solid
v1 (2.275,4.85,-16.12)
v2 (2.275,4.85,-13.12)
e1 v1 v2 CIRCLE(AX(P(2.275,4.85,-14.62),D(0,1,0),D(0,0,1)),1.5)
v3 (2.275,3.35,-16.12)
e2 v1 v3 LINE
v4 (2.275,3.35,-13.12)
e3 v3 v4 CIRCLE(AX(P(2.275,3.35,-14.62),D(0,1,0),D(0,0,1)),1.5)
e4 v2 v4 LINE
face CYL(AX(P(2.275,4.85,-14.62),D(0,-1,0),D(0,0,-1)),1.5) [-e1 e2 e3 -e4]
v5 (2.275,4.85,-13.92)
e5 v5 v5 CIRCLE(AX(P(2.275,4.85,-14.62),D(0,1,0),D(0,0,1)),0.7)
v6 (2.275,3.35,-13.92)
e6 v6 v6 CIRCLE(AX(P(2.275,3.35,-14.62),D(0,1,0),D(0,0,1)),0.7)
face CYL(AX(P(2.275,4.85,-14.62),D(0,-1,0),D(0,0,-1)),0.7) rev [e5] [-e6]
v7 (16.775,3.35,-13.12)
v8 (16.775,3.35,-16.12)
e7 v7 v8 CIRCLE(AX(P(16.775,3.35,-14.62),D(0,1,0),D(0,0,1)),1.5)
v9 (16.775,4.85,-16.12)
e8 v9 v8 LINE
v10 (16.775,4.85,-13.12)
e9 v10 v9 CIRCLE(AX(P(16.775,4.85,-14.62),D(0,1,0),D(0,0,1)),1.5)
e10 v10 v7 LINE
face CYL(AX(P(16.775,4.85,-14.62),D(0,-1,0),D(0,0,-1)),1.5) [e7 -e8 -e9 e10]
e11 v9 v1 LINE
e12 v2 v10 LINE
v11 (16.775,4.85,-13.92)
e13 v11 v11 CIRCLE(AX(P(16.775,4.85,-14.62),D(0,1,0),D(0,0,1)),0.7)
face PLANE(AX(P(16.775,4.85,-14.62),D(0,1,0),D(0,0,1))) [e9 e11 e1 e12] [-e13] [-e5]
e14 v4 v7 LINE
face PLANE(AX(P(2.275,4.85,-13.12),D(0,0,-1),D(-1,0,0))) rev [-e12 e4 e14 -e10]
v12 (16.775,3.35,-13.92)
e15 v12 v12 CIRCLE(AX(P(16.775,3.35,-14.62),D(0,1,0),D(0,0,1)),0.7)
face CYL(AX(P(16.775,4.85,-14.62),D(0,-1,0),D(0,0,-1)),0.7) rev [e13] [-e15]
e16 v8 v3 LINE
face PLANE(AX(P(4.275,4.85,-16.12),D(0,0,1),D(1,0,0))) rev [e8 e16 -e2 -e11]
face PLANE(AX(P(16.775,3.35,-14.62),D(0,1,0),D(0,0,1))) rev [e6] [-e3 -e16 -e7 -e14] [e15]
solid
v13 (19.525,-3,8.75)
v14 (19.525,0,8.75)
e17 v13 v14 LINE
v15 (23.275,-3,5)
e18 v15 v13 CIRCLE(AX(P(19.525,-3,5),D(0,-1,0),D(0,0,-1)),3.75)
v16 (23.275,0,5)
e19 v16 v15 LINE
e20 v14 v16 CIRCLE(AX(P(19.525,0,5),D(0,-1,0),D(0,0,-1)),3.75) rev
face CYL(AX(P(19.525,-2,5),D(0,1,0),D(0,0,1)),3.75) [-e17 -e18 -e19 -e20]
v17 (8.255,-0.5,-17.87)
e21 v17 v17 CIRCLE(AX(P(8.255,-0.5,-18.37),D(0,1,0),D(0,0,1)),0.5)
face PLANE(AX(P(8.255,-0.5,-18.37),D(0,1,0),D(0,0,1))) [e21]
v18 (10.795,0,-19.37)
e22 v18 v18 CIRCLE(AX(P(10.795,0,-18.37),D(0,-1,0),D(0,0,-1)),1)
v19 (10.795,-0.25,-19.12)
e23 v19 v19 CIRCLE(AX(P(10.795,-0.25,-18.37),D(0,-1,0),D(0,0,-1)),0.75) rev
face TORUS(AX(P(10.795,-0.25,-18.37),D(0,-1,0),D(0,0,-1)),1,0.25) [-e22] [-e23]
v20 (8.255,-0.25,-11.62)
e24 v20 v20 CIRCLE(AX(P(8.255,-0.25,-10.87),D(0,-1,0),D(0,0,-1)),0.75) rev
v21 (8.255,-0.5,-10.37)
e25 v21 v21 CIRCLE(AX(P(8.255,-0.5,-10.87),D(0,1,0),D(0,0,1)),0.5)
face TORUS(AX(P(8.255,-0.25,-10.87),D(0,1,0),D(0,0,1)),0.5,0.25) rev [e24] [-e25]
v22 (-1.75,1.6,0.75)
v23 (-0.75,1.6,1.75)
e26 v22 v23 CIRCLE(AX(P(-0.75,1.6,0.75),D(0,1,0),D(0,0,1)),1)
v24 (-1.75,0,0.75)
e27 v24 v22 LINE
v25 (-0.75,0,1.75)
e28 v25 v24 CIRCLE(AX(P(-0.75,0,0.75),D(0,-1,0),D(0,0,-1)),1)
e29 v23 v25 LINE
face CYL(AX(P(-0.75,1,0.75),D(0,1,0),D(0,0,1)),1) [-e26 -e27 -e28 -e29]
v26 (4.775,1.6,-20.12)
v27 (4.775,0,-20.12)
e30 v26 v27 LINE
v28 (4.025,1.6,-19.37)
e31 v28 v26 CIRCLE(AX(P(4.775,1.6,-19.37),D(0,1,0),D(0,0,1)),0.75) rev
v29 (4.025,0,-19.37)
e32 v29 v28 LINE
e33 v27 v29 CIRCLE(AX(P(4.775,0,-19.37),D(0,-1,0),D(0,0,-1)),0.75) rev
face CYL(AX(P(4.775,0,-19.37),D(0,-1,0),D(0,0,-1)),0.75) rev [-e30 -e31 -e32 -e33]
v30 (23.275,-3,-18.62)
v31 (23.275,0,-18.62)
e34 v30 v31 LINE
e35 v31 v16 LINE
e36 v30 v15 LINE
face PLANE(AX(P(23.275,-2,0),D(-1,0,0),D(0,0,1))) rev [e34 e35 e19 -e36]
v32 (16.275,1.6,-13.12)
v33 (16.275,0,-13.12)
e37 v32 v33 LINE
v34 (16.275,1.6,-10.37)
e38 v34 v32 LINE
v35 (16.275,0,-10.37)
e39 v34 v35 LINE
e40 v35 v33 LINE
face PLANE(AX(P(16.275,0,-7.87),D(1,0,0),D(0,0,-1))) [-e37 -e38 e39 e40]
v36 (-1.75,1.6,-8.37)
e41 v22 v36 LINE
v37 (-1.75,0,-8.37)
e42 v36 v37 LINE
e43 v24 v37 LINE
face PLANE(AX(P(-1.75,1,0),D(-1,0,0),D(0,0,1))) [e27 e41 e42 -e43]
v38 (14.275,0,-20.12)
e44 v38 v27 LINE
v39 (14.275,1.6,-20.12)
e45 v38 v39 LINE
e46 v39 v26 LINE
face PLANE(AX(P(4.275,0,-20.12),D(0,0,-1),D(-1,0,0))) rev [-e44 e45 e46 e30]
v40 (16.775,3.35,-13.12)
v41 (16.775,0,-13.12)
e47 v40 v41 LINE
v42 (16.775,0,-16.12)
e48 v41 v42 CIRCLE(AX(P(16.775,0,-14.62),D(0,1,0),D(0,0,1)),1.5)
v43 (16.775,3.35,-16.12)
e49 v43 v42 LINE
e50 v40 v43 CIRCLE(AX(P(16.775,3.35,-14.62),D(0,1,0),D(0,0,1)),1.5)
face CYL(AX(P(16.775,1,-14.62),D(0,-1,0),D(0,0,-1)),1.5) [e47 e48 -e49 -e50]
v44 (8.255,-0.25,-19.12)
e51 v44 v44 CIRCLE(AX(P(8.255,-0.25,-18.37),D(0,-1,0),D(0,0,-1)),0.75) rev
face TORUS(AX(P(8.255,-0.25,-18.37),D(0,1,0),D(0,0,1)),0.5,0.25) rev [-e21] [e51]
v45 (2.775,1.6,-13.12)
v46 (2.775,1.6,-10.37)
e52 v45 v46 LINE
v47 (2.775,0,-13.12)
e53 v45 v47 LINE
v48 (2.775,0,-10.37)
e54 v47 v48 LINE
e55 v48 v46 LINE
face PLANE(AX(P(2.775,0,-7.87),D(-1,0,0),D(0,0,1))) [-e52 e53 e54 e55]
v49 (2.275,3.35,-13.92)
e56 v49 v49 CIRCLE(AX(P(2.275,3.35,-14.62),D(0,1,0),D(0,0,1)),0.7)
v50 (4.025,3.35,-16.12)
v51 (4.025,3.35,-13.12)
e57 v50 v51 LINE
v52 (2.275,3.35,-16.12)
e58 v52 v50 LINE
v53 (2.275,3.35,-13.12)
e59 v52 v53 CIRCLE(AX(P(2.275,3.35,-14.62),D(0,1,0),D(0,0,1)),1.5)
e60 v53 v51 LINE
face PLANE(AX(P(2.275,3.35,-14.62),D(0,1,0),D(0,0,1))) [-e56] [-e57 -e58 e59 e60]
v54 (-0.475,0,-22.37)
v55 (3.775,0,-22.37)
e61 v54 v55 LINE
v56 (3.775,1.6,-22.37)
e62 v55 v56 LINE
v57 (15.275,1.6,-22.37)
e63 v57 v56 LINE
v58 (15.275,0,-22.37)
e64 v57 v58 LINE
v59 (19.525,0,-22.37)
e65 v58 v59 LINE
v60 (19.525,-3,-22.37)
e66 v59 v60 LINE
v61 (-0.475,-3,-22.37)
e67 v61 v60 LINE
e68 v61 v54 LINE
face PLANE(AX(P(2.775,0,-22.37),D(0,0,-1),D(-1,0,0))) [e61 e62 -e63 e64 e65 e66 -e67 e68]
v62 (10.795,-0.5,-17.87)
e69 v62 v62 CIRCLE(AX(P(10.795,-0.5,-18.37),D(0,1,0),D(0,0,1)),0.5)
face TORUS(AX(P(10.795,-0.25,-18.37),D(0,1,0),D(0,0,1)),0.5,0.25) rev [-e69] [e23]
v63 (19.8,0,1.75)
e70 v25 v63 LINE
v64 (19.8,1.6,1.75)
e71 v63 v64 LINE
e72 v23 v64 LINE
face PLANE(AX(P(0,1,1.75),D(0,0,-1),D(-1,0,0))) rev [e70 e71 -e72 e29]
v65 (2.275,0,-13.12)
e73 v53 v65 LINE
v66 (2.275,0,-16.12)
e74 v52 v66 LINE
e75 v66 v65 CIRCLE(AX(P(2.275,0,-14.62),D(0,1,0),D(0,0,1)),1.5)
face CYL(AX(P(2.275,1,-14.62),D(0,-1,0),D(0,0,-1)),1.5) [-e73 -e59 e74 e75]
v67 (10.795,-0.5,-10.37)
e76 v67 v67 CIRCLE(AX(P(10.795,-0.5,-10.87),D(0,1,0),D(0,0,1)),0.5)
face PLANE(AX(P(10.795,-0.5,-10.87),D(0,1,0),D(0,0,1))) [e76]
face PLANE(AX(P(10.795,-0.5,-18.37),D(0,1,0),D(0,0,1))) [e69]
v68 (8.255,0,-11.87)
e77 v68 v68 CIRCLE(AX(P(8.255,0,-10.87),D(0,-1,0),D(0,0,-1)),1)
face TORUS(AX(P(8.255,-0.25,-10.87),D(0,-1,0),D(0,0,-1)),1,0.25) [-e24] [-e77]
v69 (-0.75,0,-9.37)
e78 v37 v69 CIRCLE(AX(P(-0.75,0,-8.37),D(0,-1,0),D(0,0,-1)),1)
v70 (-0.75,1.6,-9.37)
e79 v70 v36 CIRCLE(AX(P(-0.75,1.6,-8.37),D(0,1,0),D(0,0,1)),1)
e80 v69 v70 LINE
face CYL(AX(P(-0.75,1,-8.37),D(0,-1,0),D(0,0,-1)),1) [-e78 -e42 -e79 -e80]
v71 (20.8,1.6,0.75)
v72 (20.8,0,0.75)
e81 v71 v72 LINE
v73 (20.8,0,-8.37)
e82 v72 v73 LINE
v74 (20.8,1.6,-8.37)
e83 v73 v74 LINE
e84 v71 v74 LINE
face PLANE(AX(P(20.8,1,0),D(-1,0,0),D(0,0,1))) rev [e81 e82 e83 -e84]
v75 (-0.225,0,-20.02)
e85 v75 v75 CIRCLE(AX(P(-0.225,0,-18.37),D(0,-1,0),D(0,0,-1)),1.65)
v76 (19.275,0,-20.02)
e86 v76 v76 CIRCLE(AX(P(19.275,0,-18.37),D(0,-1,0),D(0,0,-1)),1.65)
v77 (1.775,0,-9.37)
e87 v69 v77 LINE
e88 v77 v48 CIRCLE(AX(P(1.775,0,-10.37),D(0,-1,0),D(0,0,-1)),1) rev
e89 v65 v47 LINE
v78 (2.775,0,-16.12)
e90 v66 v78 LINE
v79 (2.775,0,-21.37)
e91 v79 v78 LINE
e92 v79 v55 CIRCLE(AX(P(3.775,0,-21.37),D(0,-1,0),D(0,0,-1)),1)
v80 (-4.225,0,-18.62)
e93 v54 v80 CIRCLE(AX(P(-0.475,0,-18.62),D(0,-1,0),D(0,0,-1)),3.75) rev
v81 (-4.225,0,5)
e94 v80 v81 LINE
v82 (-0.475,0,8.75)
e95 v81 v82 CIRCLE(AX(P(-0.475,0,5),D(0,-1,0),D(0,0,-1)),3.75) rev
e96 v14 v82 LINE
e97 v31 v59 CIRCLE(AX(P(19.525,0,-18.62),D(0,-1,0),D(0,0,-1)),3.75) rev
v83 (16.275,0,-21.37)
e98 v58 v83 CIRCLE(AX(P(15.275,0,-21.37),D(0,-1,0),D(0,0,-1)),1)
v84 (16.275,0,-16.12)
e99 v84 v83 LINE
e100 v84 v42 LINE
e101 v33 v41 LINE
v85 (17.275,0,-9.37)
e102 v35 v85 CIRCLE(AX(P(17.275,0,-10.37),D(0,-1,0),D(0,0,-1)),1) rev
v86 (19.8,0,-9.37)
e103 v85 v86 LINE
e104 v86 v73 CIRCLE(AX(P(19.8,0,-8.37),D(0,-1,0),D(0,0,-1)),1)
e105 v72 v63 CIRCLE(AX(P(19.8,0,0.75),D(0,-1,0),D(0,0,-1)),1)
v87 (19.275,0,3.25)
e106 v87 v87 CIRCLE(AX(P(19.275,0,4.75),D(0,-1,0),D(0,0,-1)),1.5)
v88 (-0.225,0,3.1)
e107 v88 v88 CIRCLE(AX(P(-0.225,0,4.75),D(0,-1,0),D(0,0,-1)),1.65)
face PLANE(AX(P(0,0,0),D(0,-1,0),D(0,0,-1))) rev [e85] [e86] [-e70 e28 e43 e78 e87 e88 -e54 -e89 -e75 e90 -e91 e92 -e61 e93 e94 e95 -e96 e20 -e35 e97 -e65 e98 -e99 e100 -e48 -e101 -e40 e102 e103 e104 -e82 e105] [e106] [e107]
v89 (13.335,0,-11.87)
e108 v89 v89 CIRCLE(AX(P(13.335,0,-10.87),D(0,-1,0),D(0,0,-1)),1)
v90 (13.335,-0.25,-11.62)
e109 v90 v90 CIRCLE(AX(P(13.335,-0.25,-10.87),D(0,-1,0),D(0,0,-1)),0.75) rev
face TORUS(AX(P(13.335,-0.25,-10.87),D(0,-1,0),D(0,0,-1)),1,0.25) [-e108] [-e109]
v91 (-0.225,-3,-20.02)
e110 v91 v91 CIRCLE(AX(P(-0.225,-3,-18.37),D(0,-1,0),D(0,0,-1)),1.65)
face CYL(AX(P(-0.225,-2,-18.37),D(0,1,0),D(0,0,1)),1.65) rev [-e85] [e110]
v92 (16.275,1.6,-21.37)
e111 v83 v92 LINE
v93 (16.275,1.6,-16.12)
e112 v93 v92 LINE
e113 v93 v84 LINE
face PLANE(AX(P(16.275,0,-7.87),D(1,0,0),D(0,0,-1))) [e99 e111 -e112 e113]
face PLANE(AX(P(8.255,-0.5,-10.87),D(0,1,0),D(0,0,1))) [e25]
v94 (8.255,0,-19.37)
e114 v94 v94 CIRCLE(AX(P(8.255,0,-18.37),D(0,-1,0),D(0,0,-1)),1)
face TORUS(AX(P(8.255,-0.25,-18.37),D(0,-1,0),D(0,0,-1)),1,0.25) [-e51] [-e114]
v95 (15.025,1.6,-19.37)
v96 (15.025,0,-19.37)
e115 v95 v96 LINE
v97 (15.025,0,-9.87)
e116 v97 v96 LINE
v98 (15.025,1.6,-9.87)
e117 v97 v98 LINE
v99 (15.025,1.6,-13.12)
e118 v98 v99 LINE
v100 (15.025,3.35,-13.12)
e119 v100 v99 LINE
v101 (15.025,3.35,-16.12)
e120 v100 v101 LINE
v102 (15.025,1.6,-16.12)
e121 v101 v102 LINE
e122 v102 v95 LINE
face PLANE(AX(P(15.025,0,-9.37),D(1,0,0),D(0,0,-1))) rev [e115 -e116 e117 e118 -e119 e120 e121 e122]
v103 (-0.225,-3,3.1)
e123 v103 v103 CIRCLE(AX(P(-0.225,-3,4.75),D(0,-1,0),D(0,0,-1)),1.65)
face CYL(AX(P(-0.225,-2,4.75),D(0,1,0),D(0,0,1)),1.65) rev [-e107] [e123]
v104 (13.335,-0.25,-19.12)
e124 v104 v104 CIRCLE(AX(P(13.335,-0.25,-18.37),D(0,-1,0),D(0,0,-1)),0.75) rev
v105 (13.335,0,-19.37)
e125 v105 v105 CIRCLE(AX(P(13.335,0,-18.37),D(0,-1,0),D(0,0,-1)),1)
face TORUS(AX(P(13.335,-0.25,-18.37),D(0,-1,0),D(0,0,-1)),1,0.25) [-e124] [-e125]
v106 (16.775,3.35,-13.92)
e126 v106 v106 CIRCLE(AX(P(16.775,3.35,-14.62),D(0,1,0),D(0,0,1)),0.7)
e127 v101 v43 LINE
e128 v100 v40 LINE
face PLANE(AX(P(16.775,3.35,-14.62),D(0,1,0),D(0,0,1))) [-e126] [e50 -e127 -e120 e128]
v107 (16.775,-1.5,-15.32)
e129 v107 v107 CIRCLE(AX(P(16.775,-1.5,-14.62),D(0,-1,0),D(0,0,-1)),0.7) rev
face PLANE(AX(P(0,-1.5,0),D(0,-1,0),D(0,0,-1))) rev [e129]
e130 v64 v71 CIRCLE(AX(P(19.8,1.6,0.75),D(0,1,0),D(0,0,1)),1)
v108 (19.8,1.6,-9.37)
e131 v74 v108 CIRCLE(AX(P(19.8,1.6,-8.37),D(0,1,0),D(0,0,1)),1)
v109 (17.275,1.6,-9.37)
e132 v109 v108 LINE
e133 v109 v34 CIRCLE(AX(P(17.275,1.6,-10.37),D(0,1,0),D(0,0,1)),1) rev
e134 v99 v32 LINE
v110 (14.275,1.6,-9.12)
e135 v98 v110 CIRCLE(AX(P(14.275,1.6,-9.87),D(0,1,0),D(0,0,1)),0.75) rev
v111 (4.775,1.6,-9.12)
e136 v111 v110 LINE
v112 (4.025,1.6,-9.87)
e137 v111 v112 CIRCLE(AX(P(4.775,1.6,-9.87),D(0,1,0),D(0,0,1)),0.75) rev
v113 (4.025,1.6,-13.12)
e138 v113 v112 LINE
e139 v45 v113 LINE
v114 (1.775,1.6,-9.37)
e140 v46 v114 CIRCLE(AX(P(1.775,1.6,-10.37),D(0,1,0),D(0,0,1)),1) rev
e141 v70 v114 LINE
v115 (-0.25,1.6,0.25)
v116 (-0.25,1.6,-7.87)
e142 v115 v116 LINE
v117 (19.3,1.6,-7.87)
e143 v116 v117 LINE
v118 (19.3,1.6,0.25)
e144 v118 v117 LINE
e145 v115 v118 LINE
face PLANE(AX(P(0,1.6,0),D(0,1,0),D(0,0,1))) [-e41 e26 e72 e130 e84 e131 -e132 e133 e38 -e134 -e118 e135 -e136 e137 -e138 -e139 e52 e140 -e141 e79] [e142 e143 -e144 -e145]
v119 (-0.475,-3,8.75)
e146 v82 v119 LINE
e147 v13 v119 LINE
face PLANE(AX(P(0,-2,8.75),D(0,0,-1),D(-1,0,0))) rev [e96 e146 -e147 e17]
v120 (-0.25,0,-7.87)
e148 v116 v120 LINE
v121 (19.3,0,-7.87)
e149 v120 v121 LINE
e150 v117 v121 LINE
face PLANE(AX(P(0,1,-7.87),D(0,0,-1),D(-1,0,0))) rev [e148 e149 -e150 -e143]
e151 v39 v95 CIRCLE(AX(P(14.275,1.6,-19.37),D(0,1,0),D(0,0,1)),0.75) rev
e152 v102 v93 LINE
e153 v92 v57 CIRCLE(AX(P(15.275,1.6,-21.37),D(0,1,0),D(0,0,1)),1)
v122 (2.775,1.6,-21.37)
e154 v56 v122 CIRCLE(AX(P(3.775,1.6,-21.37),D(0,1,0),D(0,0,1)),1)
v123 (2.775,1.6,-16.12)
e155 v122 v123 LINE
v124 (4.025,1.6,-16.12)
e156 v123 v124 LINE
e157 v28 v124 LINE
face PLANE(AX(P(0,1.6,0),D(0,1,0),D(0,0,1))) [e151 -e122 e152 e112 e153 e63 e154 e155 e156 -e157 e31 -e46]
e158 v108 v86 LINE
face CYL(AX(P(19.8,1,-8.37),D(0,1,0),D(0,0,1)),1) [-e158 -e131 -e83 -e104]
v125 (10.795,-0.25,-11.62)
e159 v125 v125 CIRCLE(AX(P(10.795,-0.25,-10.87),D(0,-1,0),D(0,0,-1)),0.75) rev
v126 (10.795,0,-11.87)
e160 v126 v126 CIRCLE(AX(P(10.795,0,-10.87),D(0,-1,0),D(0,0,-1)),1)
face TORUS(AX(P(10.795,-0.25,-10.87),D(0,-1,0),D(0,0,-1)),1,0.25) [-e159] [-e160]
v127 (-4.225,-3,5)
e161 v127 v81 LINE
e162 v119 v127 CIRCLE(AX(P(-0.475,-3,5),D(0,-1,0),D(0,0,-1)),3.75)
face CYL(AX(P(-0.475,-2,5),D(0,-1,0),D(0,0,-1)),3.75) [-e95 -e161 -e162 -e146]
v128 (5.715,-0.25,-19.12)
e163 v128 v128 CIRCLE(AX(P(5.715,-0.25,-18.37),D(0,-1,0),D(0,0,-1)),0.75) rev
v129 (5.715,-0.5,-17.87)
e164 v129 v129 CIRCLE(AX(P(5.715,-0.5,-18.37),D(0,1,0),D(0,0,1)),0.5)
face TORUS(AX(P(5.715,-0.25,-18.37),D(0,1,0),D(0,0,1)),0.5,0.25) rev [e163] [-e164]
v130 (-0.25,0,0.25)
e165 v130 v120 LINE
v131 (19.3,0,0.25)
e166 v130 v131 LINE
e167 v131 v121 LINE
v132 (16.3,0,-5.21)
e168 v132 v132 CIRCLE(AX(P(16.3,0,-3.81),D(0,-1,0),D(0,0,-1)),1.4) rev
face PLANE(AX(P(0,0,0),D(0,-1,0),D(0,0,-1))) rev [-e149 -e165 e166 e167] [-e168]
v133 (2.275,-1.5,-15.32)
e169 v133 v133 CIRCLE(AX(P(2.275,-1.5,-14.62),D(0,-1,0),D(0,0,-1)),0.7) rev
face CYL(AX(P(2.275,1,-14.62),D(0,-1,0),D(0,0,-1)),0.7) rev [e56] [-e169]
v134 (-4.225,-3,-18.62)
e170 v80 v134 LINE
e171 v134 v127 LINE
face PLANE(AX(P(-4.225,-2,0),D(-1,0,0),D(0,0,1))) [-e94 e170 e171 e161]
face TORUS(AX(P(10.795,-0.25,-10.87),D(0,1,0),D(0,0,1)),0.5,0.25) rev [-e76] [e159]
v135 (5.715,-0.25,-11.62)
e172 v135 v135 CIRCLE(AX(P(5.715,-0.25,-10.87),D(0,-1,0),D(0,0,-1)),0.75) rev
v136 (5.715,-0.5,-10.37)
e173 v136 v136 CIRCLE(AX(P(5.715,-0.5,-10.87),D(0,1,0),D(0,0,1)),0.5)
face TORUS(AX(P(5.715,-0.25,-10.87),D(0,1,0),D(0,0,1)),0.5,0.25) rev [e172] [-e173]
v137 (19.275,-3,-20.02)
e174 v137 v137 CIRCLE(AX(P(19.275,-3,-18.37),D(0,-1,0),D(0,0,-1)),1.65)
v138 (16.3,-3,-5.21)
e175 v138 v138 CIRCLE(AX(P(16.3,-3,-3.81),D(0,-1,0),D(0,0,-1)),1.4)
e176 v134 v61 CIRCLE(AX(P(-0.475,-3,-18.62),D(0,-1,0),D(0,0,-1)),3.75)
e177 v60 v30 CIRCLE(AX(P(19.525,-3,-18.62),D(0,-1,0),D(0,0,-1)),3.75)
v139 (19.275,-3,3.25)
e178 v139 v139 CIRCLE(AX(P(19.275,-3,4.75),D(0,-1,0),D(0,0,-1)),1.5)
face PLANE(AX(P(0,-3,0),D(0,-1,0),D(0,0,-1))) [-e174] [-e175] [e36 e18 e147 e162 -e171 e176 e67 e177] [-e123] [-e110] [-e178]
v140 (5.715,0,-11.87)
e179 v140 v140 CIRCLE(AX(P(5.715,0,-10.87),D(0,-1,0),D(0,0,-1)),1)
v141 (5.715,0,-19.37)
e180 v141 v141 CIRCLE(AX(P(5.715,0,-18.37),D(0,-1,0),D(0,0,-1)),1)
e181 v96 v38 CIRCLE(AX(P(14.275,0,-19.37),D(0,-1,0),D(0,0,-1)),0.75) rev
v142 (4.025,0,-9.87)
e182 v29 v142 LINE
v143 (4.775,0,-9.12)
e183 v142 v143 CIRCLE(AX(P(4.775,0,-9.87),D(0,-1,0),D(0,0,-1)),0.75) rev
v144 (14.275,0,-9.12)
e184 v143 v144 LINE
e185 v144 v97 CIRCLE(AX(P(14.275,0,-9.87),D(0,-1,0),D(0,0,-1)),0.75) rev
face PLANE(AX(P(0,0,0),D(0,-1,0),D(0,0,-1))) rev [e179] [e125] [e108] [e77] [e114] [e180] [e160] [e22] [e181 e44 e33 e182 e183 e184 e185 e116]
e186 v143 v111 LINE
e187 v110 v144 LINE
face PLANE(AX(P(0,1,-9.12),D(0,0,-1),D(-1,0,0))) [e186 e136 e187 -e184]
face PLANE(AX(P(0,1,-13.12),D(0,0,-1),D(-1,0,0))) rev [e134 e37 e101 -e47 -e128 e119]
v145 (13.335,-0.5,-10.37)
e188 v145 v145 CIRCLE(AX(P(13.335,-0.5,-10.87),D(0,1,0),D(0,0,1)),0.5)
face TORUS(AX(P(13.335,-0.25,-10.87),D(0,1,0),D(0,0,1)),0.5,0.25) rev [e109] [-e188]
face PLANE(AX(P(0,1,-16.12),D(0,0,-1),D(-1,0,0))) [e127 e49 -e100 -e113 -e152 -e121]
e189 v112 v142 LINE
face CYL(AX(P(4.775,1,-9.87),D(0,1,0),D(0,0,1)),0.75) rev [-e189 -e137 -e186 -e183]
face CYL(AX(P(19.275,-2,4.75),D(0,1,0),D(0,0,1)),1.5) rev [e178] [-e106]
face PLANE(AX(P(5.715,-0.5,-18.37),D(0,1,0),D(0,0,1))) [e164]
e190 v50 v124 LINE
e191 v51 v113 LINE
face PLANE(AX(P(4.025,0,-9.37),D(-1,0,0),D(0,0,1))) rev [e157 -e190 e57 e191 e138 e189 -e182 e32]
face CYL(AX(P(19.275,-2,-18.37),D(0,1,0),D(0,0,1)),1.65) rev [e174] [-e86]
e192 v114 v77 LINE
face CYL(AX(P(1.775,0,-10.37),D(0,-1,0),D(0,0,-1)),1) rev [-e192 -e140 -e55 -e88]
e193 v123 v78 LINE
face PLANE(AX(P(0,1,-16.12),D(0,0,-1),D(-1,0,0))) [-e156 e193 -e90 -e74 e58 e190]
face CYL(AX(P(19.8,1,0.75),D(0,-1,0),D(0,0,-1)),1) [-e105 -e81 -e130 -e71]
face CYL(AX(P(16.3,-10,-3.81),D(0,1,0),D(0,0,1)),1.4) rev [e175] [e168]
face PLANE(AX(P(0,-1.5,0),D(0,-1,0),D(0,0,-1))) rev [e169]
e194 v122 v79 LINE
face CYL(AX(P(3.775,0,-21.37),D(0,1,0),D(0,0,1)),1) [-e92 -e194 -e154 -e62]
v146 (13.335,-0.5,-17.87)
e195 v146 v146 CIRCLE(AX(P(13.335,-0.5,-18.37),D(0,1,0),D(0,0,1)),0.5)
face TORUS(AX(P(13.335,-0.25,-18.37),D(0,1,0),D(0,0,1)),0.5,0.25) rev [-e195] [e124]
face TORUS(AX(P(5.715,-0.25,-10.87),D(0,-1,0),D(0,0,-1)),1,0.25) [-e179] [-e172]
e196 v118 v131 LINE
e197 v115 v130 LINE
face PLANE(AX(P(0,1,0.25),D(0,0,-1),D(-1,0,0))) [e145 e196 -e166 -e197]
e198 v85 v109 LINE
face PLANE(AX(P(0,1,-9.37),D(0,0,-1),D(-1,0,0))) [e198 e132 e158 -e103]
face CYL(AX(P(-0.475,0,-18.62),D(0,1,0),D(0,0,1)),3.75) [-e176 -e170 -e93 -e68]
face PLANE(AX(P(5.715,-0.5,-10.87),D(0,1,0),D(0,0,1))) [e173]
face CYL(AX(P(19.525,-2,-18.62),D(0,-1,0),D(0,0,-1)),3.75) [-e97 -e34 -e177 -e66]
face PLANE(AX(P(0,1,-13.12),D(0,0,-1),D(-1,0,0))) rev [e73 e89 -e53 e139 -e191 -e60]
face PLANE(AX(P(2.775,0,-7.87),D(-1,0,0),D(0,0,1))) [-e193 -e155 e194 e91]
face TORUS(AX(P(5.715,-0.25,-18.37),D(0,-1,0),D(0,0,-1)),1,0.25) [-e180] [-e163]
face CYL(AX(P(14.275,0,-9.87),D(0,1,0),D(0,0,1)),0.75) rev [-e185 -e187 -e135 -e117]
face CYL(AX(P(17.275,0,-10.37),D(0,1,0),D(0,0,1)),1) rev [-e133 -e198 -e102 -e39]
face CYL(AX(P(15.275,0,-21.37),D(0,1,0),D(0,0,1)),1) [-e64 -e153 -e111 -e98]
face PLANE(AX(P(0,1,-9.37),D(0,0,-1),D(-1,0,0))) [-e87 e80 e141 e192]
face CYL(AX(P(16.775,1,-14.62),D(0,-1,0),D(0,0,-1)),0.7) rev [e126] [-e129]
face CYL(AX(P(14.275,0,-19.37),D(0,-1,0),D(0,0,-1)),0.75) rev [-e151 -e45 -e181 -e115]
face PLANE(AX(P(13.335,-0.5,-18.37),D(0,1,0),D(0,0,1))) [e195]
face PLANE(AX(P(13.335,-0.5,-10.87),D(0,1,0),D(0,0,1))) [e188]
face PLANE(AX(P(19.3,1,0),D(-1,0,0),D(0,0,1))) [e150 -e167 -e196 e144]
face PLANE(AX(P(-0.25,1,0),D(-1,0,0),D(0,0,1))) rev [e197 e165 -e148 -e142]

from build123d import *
from build123d.topology import SkipClean

# Parameters (mm, degrees)
SKETCH1_W              = 22.55
SKETCH1_H              = 11.12
SKETCH1_W_2            = 19.55
SKETCH1_H_2            = 8.12
BOSS_EXTRUDE1_DEPTH    = 1
SKETCH2_W              = 13.5
SKETCH2_H              = 13.5
SKETCH2_W_2            = 10.5
SKETCH2_H_2            = 10.5
BOSS_EXTRUDE2_DEPTH    = 1
SKETCH3_R              = 1.65
SKETCH3_R_2            = 1.5
SKETCH3_W              = 16.525
SKETCH3_H              = 8.12
SKETCH3_W_2            = 3.025
SKETCH3_W_3            = 10.5
SKETCH3_H_2            = 10.5
BOSS_EXTRUDE3_DEPTH    = 2
FILLET1_R              = 2.75
FILLET2_R              = 0.5
BOSS_EXTRUDE4_DEPTH    = 1
DELETEFACE1_DEPTH      = 1
SKETCH5_R              = 0.7
BOSS_EXTRUDE5_DEPTH    = 2.35
MOVE_START             = 1
MOVE_FACE1_OUTLINE_W   = 19.55
MOVE_FACE1_OUTLINE_H   = 8.12
MOVE_FACE1_DEPTH       = 0.6
SKETCH6_R              = 0.7
BOSS_EXTRUDE6_DEPTH    = 1.5
MOVE_FACE2_DEPTH       = 3.35
SKETCH7_R              = 1.5
CUT_EXTRUDE1_DEPTH     = 10
MOVE_FACE3_BY          = 0.1
MOVE_START_2           = -2
MOVE_FACE4_DEPTH       = 2
MOVE_FACE4_2_OUTLINE_W = 13.5
MOVE_FACE4_2_OUTLINE_H = 1
MOVE_FACE4_2_DEPTH     = 1.6
MOVE_START_3           = -3
MOVE_FACE5_OUTLINE_R   = 1.65
MOVE_FACE5_OUTLINE_R_2 = 1.5
MOVE_FACE5_OUTLINE_R_3 = 1.4
MOVE_FACE5_DEPTH       = 1
MOVE_START_4           = -1.5
MOVE_FACE6_OUTLINE_R   = 0.7
MOVE_FACE6_DEPTH       = 1.5
FILLET3_R              = 1
SKETCH8_R              = 0.75
CUT_EXTRUDE2_DEPTH     = 0.5
FILLET4_R              = 0.25


# Read off the part's stored shape, not the designer's step: DeleteFace1, Move Face1, Move Face2, Move Face4, Move Face5, Move Face6
# Some blends are built 0.0001 mm under size
with BuildPart() as part:
    # Sketch1 → Boss-Extrude1 (new body)
    with BuildSketch(Plane(origin=(0, 0, 0), x_dir=(1, 0, 0), z_dir=(0, 1, 0))):
        with Locations((9.525, 3.81)):
            Rectangle(SKETCH1_W, SKETCH1_H)
        with Locations((9.525, 3.81)):
            Rectangle(SKETCH1_W_2, SKETCH1_H_2, mode=Mode.SUBTRACT)
    extrude(amount=BOSS_EXTRUDE1_DEPTH)

    # Sketch2 → Boss-Extrude2 (add)
    with BuildSketch(Plane(origin=(0, 1, 0), x_dir=(1, 0, 0), z_dir=(0, 1, 0))):
        with Locations((9.525, 14.62)):
            Rectangle(SKETCH2_W, SKETCH2_H)
        with Locations((9.525, 14.62)):
            Rectangle(SKETCH2_W_2, SKETCH2_H_2, mode=Mode.SUBTRACT)
    extrude(amount=-BOSS_EXTRUDE2_DEPTH)

    # Sketch3 → Boss-Extrude3 (add)
    # profile 1 of 8: a face of its own
    with BuildSketch(Plane.XZ):
        with BuildLine():
            Line((-1.75, -9.37), (-1.75, 1.75))
            Line((-1.75, 1.75), (16.275, 1.75))
            Line((16.275, 1.75), (20.8, 1.75))
            Line((20.8, 1.75), (20.8, -9.37))
            Line((20.8, -9.37), (20.8, -17.74002))
            ThreePointArc((20.8, -17.74002), (20.893448, -18.048869), (20.925, -18.37))
            ThreePointArc((20.925, -18.37), (20.893448, -18.691131), (20.8, -18.99998))
            Line((20.8, -18.99998), (20.8, -21.37))
            Line((20.8, -21.37), (22.275, -21.37))
            Line((22.275, -21.37), (22.275, 7.75))
            Line((22.275, 7.75), (-3.225, 7.75))
            Line((-3.225, 7.75), (-3.225, -21.37))
            Line((-3.225, -21.37), (-1.75, -21.37))
            Line((-1.75, -21.37), (-1.75, -18.99998))
            ThreePointArc((-1.75, -18.99998), (-1.875, -18.37), (-1.75, -17.74002))
            Line((-1.75, -17.74002), (-1.75, -9.37))
        make_face()
        with Locations(Location((-0.225, 4.75, 0), (0, 0, 270))):
            Circle(SKETCH3_R, mode=Mode.SUBTRACT)
        with Locations(Location((19.275, 4.75, 0), (0, 0, 270))):
            Circle(SKETCH3_R_2, mode=Mode.SUBTRACT)
    # profile 2 of 8: a face of its own
    with BuildSketch(Plane.XZ):
        with Locations((8.0125, -3.81)):
            Rectangle(SKETCH3_W, SKETCH3_H)
    # profile 3 of 8: a face of its own
    with BuildSketch(Plane.XZ):
        Polygon((20.8, 1.75), (16.275, 1.75), (16.275, 0.25), (19.3, 0.25), (19.3, -7.87), (16.275, -7.87), (16.275, -9.37), (20.8, -9.37), align=None)
    # profile 4 of 8: a face of its own
    with BuildSketch(Plane.XZ):
        with Locations((17.7875, -3.81)):
            Rectangle(SKETCH3_W_2, SKETCH3_H)
    # profile 5 of 8: a face of its own
    with BuildSketch(Plane.XZ):
        with BuildLine():
            Line((2.775, -9.37), (-1.75, -9.37))
            Line((-1.75, -9.37), (-1.75, -17.74002))
            ThreePointArc((-1.75, -17.74002), (0.096131, -16.751552), (1.425, -18.37))
            ThreePointArc((1.425, -18.37), (0.096131, -19.988448), (-1.75, -18.99998))
            Line((-1.75, -18.99998), (-1.75, -21.37))
            Line((-1.75, -21.37), (2.775, -21.37))
            Line((2.775, -21.37), (2.775, -9.37))
        make_face()
    # profile 6 of 8: a face of its own
    with BuildSketch(Plane.XZ):
        Polygon((16.275, 1.75), (-1.75, 1.75), (-1.75, -9.37), (2.775, -9.37), (2.775, -21.37), (16.275, -21.37), (16.275, -9.37), (16.275, -7.87), (-0.25, -7.87), (-0.25, 0.25), (16.275, 0.25), align=None)
        with Locations((9.525, -14.62)):
            Rectangle(SKETCH3_W_3, SKETCH3_H_2, mode=Mode.SUBTRACT)
    # profile 7 of 8: a face of its own
    with BuildSketch(Plane.XZ):
        with Locations((9.525, -14.62)):
            Rectangle(SKETCH3_W_3, SKETCH3_H_2)
    # profile 8 of 8: a face of its own
    with BuildSketch(Plane.XZ):
        with BuildLine():
            Line((20.8, -17.74002), (20.8, -9.37))
            Line((20.8, -9.37), (16.275, -9.37))
            Line((16.275, -9.37), (16.275, -21.37))
            Line((16.275, -21.37), (20.8, -21.37))
            Line((20.8, -21.37), (20.8, -18.99998))
            ThreePointArc((20.8, -18.99998), (17.625, -18.37), (20.8, -17.74002))
        make_face()
    extrude(amount=BOSS_EXTRUDE3_DEPTH)

    # Fillet1
    fillet1_edges = [part.edges().sort_by_distance(p)[0] for p in [
        (-3.225, -1, 7.75),
        (-3.225, -1, -21.37),
        (22.275, -1, -21.37),
        (22.275, -1, 7.75),
    ]]
    fillet(fillet1_edges, radius=FILLET1_R)

    # Fillet2
    fillet2_edges = [part.edges().sort_by_distance(p)[0] for p in [
        (4.275, 0.5, -19.87),
        (14.775, 0.5, -19.87),
        (14.775, 0.5, -9.37),
        (4.275, 0.5, -9.37),
    ]]
    fillet(fillet2_edges, radius=FILLET2_R)

    # Sketch4 → Boss-Extrude4 (add)
    with BuildSketch(Plane(origin=(0, 0, 0), x_dir=(1, 0, 0), z_dir=(0, 1, 0))):
        with BuildLine():
            Line((16.275, 16.12), (16.275, 15.109898))
            ThreePointArc((16.275, 15.109898), (17.039575, 15.268074), (17.475, 14.62))
            ThreePointArc((17.475, 14.62), (17.039575, 13.971926), (16.275, 14.130102))
            Line((16.275, 14.130102), (16.275, 13.12))
            Line((16.275, 13.12), (16.775, 13.12))
            ThreePointArc((16.775, 13.12), (18.275, 14.62), (16.775, 16.12))
            Line((16.775, 16.12), (16.275, 16.12))
        make_face()
        with BuildLine():
            Line((2.775, 15.109898), (2.775, 16.12))
            Line((2.775, 16.12), (2.275, 16.12))
            ThreePointArc((2.275, 16.12), (0.775, 14.62), (2.275, 13.12))
            Line((2.275, 13.12), (2.775, 13.12))
            Line((2.775, 13.12), (2.775, 14.130102))
            ThreePointArc((2.775, 14.130102), (1.575, 14.62), (2.775, 15.109898))
        make_face()
    extrude(amount=BOSS_EXTRUDE4_DEPTH)

    # DeleteFace1 outline → DeleteFace1 (cut)
    with BuildSketch(Plane(origin=(0, 0, 0), x_dir=(1, 0, 0), z_dir=(0, 1, 0))):
        with BuildLine():
            ThreePointArc((2.775, 14.130102), (2.975, 14.62), (2.775, 15.109898))
            Line((2.775, 15.109898), (2.775, 14.130102))
        make_face()
        with BuildLine():
            Line((16.275, 14.130102), (16.275, 15.109898))
            ThreePointArc((16.275, 15.109898), (16.075, 14.62), (16.275, 14.130102))
        make_face()
    extrude(amount=DELETEFACE1_DEPTH, mode=Mode.SUBTRACT)

    # Sketch5 → Boss-Extrude5 (add)
    # profile 1 of 2: a face of its own
    with SkipClean():  # the faces are left unmerged after this step: merging them gives an invalid solid
        with BuildSketch(Plane(origin=(0, 1, 0), x_dir=(1, 0, 0), z_dir=(0, 1, 0))):
            with BuildLine():
                Line((4.275, 16.12), (4.275, 13.12))
                Line((4.275, 13.12), (2.275, 13.12))
                ThreePointArc((2.275, 13.12), (0.775, 14.62), (2.275, 16.12))
                Line((2.275, 16.12), (4.275, 16.12))
            make_face()
            with Locations(Location((2.275, 14.62, 0), (0, 0, 270))):
                Circle(SKETCH5_R, mode=Mode.SUBTRACT)
        # profile 2 of 2: a face of its own
        with BuildSketch(Plane(origin=(0, 1, 0), x_dir=(1, 0, 0), z_dir=(0, 1, 0))):
            with BuildLine():
                Line((14.775, 13.12), (14.775, 16.12))
                Line((14.775, 16.12), (16.775, 16.12))
                ThreePointArc((16.775, 16.12), (18.275, 14.62), (16.775, 13.12))
                Line((16.775, 13.12), (14.775, 13.12))
            make_face()
            with Locations(Location((16.775, 14.62, 0), (0, 0, 270))):
                Circle(SKETCH5_R, mode=Mode.SUBTRACT)
        extrude(amount=BOSS_EXTRUDE5_DEPTH)

    # Move Face1 outline → Move Face1 (add)
    # profile 1 of 2: a face of its own
    with SkipClean():  # the faces are left unmerged after this step: merging them gives an invalid solid
        with BuildSketch(Plane(origin=(0, 0, 0), x_dir=(1, 0, 0), z_dir=(0, 1, 0)).offset(MOVE_START)):
            with BuildLine():
                Line((14.775, 16.12), (16.275, 16.12))
                Line((16.275, 16.12), (16.275, 21.37))
                Line((16.275, 21.37), (2.775, 21.37))
                Line((2.775, 21.37), (2.775, 16.12))
                Line((2.775, 16.12), (4.275, 16.12))
                Line((4.275, 16.12), (4.275, 19.37))
                ThreePointArc((4.275, 19.37), (4.421447, 19.723553), (4.775, 19.87))
                Line((4.775, 19.87), (14.275, 19.87))
                ThreePointArc((14.275, 19.87), (14.628553, 19.723553), (14.775, 19.37))
                Line((14.775, 19.37), (14.775, 16.12))
            make_face()
        # profile 2 of 2: a face of its own
        with BuildSketch(Plane(origin=(0, 0, 0), x_dir=(1, 0, 0), z_dir=(0, 1, 0)).offset(MOVE_START)):
            with BuildLine():
                Line((16.275, 13.12), (14.775, 13.12))
                Line((14.775, 13.12), (14.775, 9.87))
                ThreePointArc((14.775, 9.87), (14.628553, 9.516447), (14.275, 9.37))
                Line((14.275, 9.37), (4.775, 9.37))
                ThreePointArc((4.775, 9.37), (4.421447, 9.516447), (4.275, 9.87))
                Line((4.275, 9.87), (4.275, 13.12))
                Line((4.275, 13.12), (2.775, 13.12))
                Line((2.775, 13.12), (2.775, 9.37))
                Line((2.775, 9.37), (-1.75, 9.37))
                Line((-1.75, 9.37), (-1.75, -1.75))
                Line((-1.75, -1.75), (20.8, -1.75))
                Line((20.8, -1.75), (20.8, 9.37))
                Line((20.8, 9.37), (16.275, 9.37))
                Line((16.275, 9.37), (16.275, 13.12))
            make_face()
            with Locations((9.525, 3.81)):
                Rectangle(MOVE_FACE1_OUTLINE_W, MOVE_FACE1_OUTLINE_H, mode=Mode.SUBTRACT)
        extrude(amount=MOVE_FACE1_DEPTH)

    # Move Face2 outline → Move Face2 (cut)
    with SkipClean():  # the faces are left unmerged after this step: merging them gives an invalid solid
        with BuildSketch(Plane(origin=(0, 0, 0), x_dir=(1, 0, 0), z_dir=(0, 1, 0))):
            with BuildLine():
                Line((4.775, 9.12), (14.275, 9.12))
                ThreePointArc((14.275, 9.12), (14.80533, 9.33967), (15.025, 9.87))
                Line((15.025, 9.87), (15.025, 19.37))
                ThreePointArc((15.025, 19.37), (14.80533, 19.90033), (14.275, 20.12))
                Line((14.275, 20.12), (4.775, 20.12))
                ThreePointArc((4.775, 20.12), (4.24467, 19.90033), (4.025, 19.37))
                Line((4.025, 19.37), (4.025, 9.87))
                ThreePointArc((4.025, 9.87), (4.24467, 9.33967), (4.775, 9.12))
            make_face()
            with BuildLine():
                Line((4.275, 9.87), (4.275, 19.37))
                ThreePointArc((4.275, 19.37), (4.421447, 19.723553), (4.775, 19.87))
                Line((4.775, 19.87), (14.275, 19.87))
                ThreePointArc((14.275, 19.87), (14.628553, 19.723553), (14.775, 19.37))
                Line((14.775, 19.37), (14.775, 9.87))
                ThreePointArc((14.775, 9.87), (14.628553, 9.516447), (14.275, 9.37))
                Line((14.275, 9.37), (4.775, 9.37))
                ThreePointArc((4.775, 9.37), (4.421447, 9.516447), (4.275, 9.87))
            make_face(mode=Mode.SUBTRACT)
        extrude(amount=MOVE_FACE2_DEPTH, mode=Mode.SUBTRACT)

    # Sketch7 → Cut-Extrude1 (cut)
    with SkipClean():  # the faces are left unmerged after this step: merging them gives an invalid solid
        with BuildSketch(Plane(origin=(0, 0, 0), x_dir=(1, 0, 0), z_dir=(0, 1, 0))):
            with Locations(Location((16.3, 3.81, 0), (0, 0, 270))):
                Circle(SKETCH7_R)
        extrude(amount=-CUT_EXTRUDE1_DEPTH, mode=Mode.SUBTRACT)

    # Move Face3: a curved face moved outward by 0.1
    add(Solid.thicken(part.faces().sort_by_distance((16.3, -1, -5.31))[0], MOVE_FACE3_BY))

    # Move Face4 outline → Move Face4 (add)
    with SkipClean():  # the faces are left unmerged after this step: merging them gives an invalid solid
        with BuildSketch(Plane(origin=(0, 0, 0), x_dir=(1, 0, 0), z_dir=(0, 1, 0)).offset(MOVE_START_2)):
            with BuildLine():
                ThreePointArc((-0.475, 22.37), (-3.12665, 21.27165), (-4.225, 18.62))
                Line((-4.225, 18.62), (-4.225, -5))
                ThreePointArc((-4.225, -5), (-3.12665, -7.65165), (-0.475, -8.75))
                Line((-0.475, -8.75), (19.525, -8.75))
                ThreePointArc((19.525, -8.75), (22.17665, -7.65165), (23.275, -5))
                Line((23.275, -5), (23.275, 18.62))
                ThreePointArc((23.275, 18.62), (22.17665, 21.27165), (19.525, 22.37))
                Line((19.525, 22.37), (-0.475, 22.37))
            make_face()
            with BuildLine():
                ThreePointArc((19.525, 21.37), (21.469544, 20.564544), (22.275, 18.62))
                Line((22.275, 18.62), (22.275, -5))
                ThreePointArc((22.275, -5), (21.469544, -6.944544), (19.525, -7.75))
                Line((19.525, -7.75), (-0.475, -7.75))
                ThreePointArc((-0.475, -7.75), (-2.419544, -6.944544), (-3.225, -5))
                Line((-3.225, -5), (-3.225, 18.62))
                ThreePointArc((-3.225, 18.62), (-2.419544, 20.564544), (-0.475, 21.37))
                Line((-0.475, 21.37), (19.525, 21.37))
            make_face(mode=Mode.SUBTRACT)
        extrude(amount=MOVE_FACE4_DEPTH)

    # Move Face4 2 outline → Move Face4 2 (add)
    with SkipClean():  # the faces are left unmerged after this step: merging them gives an invalid solid
        with BuildSketch(Plane(origin=(0, 0, 0), x_dir=(1, 0, 0), z_dir=(0, 1, 0))):
            with Locations((9.525, 21.87)):
                Rectangle(MOVE_FACE4_2_OUTLINE_W, MOVE_FACE4_2_OUTLINE_H)
        extrude(amount=MOVE_FACE4_2_DEPTH)

    # Move Face5 outline → Move Face5 (add)
    with SkipClean():  # the faces are left unmerged after this step: merging them gives an invalid solid
        with BuildSketch(Plane(origin=(0, 0, 0), x_dir=(1, 0, 0), z_dir=(0, 1, 0)).offset(MOVE_START_3)):
            with BuildLine():
                ThreePointArc((23.275, 18.62), (22.17665, 21.27165), (19.525, 22.37))
                Line((19.525, 22.37), (-0.475, 22.37))
                ThreePointArc((-0.475, 22.37), (-3.12665, 21.27165), (-4.225, 18.62))
                Line((-4.225, 18.62), (-4.225, -5))
                ThreePointArc((-4.225, -5), (-3.12665, -7.65165), (-0.475, -8.75))
                Line((-0.475, -8.75), (19.525, -8.75))
                ThreePointArc((19.525, -8.75), (22.17665, -7.65165), (23.275, -5))
                Line((23.275, -5), (23.275, 18.62))
            make_face()
            with Locations((-0.225, -4.75)):
                Circle(MOVE_FACE5_OUTLINE_R, mode=Mode.SUBTRACT)
            with Locations((19.275, -4.75)):
                Circle(MOVE_FACE5_OUTLINE_R_2, mode=Mode.SUBTRACT)
            with Locations((16.3, 3.81)):
                Circle(MOVE_FACE5_OUTLINE_R_3, mode=Mode.SUBTRACT)
            with Locations((-0.225, 18.37)):
                Circle(MOVE_FACE5_OUTLINE_R, mode=Mode.SUBTRACT)
            with Locations((19.275, 18.37)):
                Circle(MOVE_FACE5_OUTLINE_R, mode=Mode.SUBTRACT)
        extrude(amount=MOVE_FACE5_DEPTH)

    # Move Face6 outline → Move Face6 (cut)
    with SkipClean():  # the faces are left unmerged after this step: merging them gives an invalid solid
        with BuildSketch(Plane(origin=(0, 0, 0), x_dir=(1, 0, 0), z_dir=(0, 1, 0)).offset(MOVE_START_4)):
            with Locations((16.775, 14.62)):
                Circle(MOVE_FACE6_OUTLINE_R)
            with Locations((2.275, 14.62)):
                Circle(MOVE_FACE6_OUTLINE_R)
        extrude(amount=MOVE_FACE6_DEPTH, mode=Mode.SUBTRACT)

    # Fillet3
    # the kernel refuses this fillet: 1 mm, written as the material it adds along each edge
    with BuildSketch(Plane(origin=(2.775, -2.5, -9.37), x_dir=(-1, 0, 0), z_dir=(0, 1, 0)), Plane(origin=(16.275, 1, -9.37), x_dir=(1, 0, 0), z_dir=(0, -1, 0))) as fillet3_piece_1:
        with BuildLine():
            CenterArc((FILLET3_R, -FILLET3_R), FILLET3_R, 90, 90)
            Line((0, -FILLET3_R), (0, 0))
            Line((0, 0), (FILLET3_R, 0))
        make_face()
    extrude(amount=3.5)
    with BuildSketch(Plane(origin=(16.275, 1, -9.37), x_dir=(1, 0, 0), z_dir=(0, 1, 0))) as fillet3_piece_2:
        with BuildLine():
            CenterArc((FILLET3_R, FILLET3_R), FILLET3_R, 180, 90)
            Line((0, FILLET3_R), (0, 0))
            Line((0, 0), (FILLET3_R, 0))
        make_face()
    extrude(amount=0.6)
    with BuildSketch(Plane(origin=(2.775, 1, -9.37), x_dir=(-1, 0, 0), z_dir=(0, 1, 0))) as fillet3_piece_3:
        with BuildLine():
            CenterArc((FILLET3_R, -FILLET3_R), FILLET3_R, 90, 90)
            Line((0, -FILLET3_R), (0, 0))
            Line((0, 0), (FILLET3_R, 0))
        make_face()
    extrude(amount=0.6)
    # the kernel refuses this fillet: 1 mm, written as the material it takes off along each edge
    with BuildSketch(Plane(origin=(-1.75, 0, -9.37), x_dir=(0, 0, 1), z_dir=(0, 1, 0)), Plane(origin=(20.8, 0, 1.75), x_dir=(0, 0, -1), z_dir=(0, 1, 0)), Plane(origin=(-1.75, 0, 1.75), x_dir=(1, 0, 0), z_dir=(0, 1, 0))) as fillet3_2_piece_1:
        with BuildLine():
            CenterArc((FILLET3_R, FILLET3_R), FILLET3_R, 180, 90)
            Line((0, FILLET3_R), (0, 0))
            Line((0, 0), (FILLET3_R, 0))
        make_face()
    extrude(amount=1, mode=Mode.SUBTRACT)
    with BuildSketch(Plane(origin=(20.8, 0, -9.37), x_dir=(0, 0, 1), z_dir=(0, 1, 0))) as fillet3_2_piece_2:
        with BuildLine():
            CenterArc((FILLET3_R, -FILLET3_R), FILLET3_R, 90, 90)
            Line((0, -FILLET3_R), (0, 0))
            Line((0, 0), (FILLET3_R, 0))
        make_face()
    extrude(amount=1, mode=Mode.SUBTRACT)
    with BuildSketch(Plane(origin=(2.775, 0, -22.37), x_dir=(0, 0, 1), z_dir=(0, 1, 0))) as fillet3_2_piece_3:
        with BuildLine():
            CenterArc((FILLET3_R, FILLET3_R), FILLET3_R, 180, 90)
            Line((0, FILLET3_R), (0, 0))
            Line((0, 0), (FILLET3_R, 0))
        make_face()
    extrude(amount=4.1, mode=Mode.SUBTRACT)
    with BuildSketch(Plane(origin=(16.275, 0, -22.37), x_dir=(0, 0, 1), z_dir=(0, 1, 0))) as fillet3_2_piece_4:
        with BuildLine():
            CenterArc((FILLET3_R, -FILLET3_R), FILLET3_R, 90, 90)
            Line((0, -FILLET3_R), (0, 0))
            Line((0, 0), (FILLET3_R, 0))
        make_face()
    extrude(amount=4.1, mode=Mode.SUBTRACT)
    with BuildSketch(Plane(origin=(-1.75, 1, 1.75), x_dir=(1, 0, 0), z_dir=(0, 1, 0)), Plane(origin=(20.8, 1, 1.75), x_dir=(0, 0, -1), z_dir=(0, 1, 0)), Plane(origin=(-1.75, 1, -9.37), x_dir=(0, 0, 1), z_dir=(0, 1, 0))) as fillet3_2_piece_5:
        with BuildLine():
            CenterArc((FILLET3_R, FILLET3_R), FILLET3_R, 180, 90)
            Line((0, FILLET3_R), (0, 0))
            Line((0, 0), (FILLET3_R, 0))
        make_face()
    extrude(amount=3.1, mode=Mode.SUBTRACT)
    with BuildSketch(Plane(origin=(20.8, 1, -9.37), x_dir=(0, 0, 1), z_dir=(0, 1, 0))) as fillet3_2_piece_6:
        with BuildLine():
            CenterArc((FILLET3_R, -FILLET3_R), FILLET3_R, 90, 90)
            Line((0, -FILLET3_R), (0, 0))
            Line((0, 0), (FILLET3_R, 0))
        make_face()
    extrude(amount=3.1, mode=Mode.SUBTRACT)

    # Sketch8 → Cut-Extrude2 (cut)
    with BuildSketch(Plane(origin=(0, 0, 0), x_dir=(1, 0, 0), z_dir=(0, 1, 0))):
        with Locations(Location((5.715, 18.37, 0), (0, 0, 270))):
            Circle(SKETCH8_R)
        with Locations(Location((13.335, 18.37, 0), (0, 0, 270))):
            Circle(SKETCH8_R)
        with Locations(Location((13.335, 10.87, 0), (0, 0, 270))):
            Circle(SKETCH8_R)
        with Locations(Location((10.795, 10.87, 0), (0, 0, 270))):
            Circle(SKETCH8_R)
        with Locations(Location((8.255, 10.87, 0), (0, 0, 270))):
            Circle(SKETCH8_R)
        with Locations(Location((5.715, 10.87, 0), (0, 0, 270))):
            Circle(SKETCH8_R)
        with Locations(Location((8.255, 18.37, 0), (0, 0, 270))):
            Circle(SKETCH8_R)
        with Locations(Location((10.795, 18.37, 0), (0, 0, 270))):
            Circle(SKETCH8_R)
    extrude(amount=-CUT_EXTRUDE2_DEPTH, mode=Mode.SUBTRACT)

    # Fillet4
    fillet4_edges = [part.edges().sort_by_distance(p)[0] for p in [
        (13.335, -0.5, -19.12),
        (13.335, 0, -19.12),
        (13.335, -0.5, -11.62),
        (13.335, 0, -11.62),
        (10.795, -0.5, -11.62),
        (10.795, 0, -11.62),
        (8.255, -0.5, -11.62),
        (8.255, 0, -11.62),
        (5.715, -0.5, -11.62),
        (5.715, 0, -11.62),
        (8.255, -0.5, -19.12),
        (8.255, 0, -19.12),
        (10.795, -0.5, -19.12),
        (10.795, 0, -19.12),
        (5.715, -0.5, -19.12),
        (5.715, 0, -19.12),
    ]]
    fillet(fillet4_edges, radius=FILLET4_R - 0.0001)  # a hair under: the kernel refuses the full size


with BuildPart() as body_2:
    # Sketch6 → Boss-Extrude6 (new body)
    with BuildSketch(Plane(origin=(0, 3.35, 0), x_dir=(1, 0, 0), z_dir=(0, 1, 0))):
        with BuildLine():
            Line((4.275, 16.12), (14.775, 16.12))
            Line((14.775, 16.12), (16.775, 16.12))
            ThreePointArc((16.775, 16.12), (18.275, 14.62), (16.775, 13.12))
            Line((16.775, 13.12), (14.775, 13.12))
            Line((14.775, 13.12), (4.275, 13.12))
            Line((4.275, 13.12), (2.275, 13.12))
            ThreePointArc((2.275, 13.12), (0.775, 14.62), (2.275, 16.12))
            Line((2.275, 16.12), (4.275, 16.12))
        make_face()
        with Locations(Location((16.775, 14.62, 0), (0, 0, 270))):
            Circle(SKETCH6_R, mode=Mode.SUBTRACT)
        with Locations(Location((2.275, 14.62, 0), (0, 0, 270))):
            Circle(SKETCH6_R, mode=Mode.SUBTRACT)
    extrude(amount=BOSS_EXTRUDE6_DEPTH)


solid = Compound([part.part, body_2.part])
